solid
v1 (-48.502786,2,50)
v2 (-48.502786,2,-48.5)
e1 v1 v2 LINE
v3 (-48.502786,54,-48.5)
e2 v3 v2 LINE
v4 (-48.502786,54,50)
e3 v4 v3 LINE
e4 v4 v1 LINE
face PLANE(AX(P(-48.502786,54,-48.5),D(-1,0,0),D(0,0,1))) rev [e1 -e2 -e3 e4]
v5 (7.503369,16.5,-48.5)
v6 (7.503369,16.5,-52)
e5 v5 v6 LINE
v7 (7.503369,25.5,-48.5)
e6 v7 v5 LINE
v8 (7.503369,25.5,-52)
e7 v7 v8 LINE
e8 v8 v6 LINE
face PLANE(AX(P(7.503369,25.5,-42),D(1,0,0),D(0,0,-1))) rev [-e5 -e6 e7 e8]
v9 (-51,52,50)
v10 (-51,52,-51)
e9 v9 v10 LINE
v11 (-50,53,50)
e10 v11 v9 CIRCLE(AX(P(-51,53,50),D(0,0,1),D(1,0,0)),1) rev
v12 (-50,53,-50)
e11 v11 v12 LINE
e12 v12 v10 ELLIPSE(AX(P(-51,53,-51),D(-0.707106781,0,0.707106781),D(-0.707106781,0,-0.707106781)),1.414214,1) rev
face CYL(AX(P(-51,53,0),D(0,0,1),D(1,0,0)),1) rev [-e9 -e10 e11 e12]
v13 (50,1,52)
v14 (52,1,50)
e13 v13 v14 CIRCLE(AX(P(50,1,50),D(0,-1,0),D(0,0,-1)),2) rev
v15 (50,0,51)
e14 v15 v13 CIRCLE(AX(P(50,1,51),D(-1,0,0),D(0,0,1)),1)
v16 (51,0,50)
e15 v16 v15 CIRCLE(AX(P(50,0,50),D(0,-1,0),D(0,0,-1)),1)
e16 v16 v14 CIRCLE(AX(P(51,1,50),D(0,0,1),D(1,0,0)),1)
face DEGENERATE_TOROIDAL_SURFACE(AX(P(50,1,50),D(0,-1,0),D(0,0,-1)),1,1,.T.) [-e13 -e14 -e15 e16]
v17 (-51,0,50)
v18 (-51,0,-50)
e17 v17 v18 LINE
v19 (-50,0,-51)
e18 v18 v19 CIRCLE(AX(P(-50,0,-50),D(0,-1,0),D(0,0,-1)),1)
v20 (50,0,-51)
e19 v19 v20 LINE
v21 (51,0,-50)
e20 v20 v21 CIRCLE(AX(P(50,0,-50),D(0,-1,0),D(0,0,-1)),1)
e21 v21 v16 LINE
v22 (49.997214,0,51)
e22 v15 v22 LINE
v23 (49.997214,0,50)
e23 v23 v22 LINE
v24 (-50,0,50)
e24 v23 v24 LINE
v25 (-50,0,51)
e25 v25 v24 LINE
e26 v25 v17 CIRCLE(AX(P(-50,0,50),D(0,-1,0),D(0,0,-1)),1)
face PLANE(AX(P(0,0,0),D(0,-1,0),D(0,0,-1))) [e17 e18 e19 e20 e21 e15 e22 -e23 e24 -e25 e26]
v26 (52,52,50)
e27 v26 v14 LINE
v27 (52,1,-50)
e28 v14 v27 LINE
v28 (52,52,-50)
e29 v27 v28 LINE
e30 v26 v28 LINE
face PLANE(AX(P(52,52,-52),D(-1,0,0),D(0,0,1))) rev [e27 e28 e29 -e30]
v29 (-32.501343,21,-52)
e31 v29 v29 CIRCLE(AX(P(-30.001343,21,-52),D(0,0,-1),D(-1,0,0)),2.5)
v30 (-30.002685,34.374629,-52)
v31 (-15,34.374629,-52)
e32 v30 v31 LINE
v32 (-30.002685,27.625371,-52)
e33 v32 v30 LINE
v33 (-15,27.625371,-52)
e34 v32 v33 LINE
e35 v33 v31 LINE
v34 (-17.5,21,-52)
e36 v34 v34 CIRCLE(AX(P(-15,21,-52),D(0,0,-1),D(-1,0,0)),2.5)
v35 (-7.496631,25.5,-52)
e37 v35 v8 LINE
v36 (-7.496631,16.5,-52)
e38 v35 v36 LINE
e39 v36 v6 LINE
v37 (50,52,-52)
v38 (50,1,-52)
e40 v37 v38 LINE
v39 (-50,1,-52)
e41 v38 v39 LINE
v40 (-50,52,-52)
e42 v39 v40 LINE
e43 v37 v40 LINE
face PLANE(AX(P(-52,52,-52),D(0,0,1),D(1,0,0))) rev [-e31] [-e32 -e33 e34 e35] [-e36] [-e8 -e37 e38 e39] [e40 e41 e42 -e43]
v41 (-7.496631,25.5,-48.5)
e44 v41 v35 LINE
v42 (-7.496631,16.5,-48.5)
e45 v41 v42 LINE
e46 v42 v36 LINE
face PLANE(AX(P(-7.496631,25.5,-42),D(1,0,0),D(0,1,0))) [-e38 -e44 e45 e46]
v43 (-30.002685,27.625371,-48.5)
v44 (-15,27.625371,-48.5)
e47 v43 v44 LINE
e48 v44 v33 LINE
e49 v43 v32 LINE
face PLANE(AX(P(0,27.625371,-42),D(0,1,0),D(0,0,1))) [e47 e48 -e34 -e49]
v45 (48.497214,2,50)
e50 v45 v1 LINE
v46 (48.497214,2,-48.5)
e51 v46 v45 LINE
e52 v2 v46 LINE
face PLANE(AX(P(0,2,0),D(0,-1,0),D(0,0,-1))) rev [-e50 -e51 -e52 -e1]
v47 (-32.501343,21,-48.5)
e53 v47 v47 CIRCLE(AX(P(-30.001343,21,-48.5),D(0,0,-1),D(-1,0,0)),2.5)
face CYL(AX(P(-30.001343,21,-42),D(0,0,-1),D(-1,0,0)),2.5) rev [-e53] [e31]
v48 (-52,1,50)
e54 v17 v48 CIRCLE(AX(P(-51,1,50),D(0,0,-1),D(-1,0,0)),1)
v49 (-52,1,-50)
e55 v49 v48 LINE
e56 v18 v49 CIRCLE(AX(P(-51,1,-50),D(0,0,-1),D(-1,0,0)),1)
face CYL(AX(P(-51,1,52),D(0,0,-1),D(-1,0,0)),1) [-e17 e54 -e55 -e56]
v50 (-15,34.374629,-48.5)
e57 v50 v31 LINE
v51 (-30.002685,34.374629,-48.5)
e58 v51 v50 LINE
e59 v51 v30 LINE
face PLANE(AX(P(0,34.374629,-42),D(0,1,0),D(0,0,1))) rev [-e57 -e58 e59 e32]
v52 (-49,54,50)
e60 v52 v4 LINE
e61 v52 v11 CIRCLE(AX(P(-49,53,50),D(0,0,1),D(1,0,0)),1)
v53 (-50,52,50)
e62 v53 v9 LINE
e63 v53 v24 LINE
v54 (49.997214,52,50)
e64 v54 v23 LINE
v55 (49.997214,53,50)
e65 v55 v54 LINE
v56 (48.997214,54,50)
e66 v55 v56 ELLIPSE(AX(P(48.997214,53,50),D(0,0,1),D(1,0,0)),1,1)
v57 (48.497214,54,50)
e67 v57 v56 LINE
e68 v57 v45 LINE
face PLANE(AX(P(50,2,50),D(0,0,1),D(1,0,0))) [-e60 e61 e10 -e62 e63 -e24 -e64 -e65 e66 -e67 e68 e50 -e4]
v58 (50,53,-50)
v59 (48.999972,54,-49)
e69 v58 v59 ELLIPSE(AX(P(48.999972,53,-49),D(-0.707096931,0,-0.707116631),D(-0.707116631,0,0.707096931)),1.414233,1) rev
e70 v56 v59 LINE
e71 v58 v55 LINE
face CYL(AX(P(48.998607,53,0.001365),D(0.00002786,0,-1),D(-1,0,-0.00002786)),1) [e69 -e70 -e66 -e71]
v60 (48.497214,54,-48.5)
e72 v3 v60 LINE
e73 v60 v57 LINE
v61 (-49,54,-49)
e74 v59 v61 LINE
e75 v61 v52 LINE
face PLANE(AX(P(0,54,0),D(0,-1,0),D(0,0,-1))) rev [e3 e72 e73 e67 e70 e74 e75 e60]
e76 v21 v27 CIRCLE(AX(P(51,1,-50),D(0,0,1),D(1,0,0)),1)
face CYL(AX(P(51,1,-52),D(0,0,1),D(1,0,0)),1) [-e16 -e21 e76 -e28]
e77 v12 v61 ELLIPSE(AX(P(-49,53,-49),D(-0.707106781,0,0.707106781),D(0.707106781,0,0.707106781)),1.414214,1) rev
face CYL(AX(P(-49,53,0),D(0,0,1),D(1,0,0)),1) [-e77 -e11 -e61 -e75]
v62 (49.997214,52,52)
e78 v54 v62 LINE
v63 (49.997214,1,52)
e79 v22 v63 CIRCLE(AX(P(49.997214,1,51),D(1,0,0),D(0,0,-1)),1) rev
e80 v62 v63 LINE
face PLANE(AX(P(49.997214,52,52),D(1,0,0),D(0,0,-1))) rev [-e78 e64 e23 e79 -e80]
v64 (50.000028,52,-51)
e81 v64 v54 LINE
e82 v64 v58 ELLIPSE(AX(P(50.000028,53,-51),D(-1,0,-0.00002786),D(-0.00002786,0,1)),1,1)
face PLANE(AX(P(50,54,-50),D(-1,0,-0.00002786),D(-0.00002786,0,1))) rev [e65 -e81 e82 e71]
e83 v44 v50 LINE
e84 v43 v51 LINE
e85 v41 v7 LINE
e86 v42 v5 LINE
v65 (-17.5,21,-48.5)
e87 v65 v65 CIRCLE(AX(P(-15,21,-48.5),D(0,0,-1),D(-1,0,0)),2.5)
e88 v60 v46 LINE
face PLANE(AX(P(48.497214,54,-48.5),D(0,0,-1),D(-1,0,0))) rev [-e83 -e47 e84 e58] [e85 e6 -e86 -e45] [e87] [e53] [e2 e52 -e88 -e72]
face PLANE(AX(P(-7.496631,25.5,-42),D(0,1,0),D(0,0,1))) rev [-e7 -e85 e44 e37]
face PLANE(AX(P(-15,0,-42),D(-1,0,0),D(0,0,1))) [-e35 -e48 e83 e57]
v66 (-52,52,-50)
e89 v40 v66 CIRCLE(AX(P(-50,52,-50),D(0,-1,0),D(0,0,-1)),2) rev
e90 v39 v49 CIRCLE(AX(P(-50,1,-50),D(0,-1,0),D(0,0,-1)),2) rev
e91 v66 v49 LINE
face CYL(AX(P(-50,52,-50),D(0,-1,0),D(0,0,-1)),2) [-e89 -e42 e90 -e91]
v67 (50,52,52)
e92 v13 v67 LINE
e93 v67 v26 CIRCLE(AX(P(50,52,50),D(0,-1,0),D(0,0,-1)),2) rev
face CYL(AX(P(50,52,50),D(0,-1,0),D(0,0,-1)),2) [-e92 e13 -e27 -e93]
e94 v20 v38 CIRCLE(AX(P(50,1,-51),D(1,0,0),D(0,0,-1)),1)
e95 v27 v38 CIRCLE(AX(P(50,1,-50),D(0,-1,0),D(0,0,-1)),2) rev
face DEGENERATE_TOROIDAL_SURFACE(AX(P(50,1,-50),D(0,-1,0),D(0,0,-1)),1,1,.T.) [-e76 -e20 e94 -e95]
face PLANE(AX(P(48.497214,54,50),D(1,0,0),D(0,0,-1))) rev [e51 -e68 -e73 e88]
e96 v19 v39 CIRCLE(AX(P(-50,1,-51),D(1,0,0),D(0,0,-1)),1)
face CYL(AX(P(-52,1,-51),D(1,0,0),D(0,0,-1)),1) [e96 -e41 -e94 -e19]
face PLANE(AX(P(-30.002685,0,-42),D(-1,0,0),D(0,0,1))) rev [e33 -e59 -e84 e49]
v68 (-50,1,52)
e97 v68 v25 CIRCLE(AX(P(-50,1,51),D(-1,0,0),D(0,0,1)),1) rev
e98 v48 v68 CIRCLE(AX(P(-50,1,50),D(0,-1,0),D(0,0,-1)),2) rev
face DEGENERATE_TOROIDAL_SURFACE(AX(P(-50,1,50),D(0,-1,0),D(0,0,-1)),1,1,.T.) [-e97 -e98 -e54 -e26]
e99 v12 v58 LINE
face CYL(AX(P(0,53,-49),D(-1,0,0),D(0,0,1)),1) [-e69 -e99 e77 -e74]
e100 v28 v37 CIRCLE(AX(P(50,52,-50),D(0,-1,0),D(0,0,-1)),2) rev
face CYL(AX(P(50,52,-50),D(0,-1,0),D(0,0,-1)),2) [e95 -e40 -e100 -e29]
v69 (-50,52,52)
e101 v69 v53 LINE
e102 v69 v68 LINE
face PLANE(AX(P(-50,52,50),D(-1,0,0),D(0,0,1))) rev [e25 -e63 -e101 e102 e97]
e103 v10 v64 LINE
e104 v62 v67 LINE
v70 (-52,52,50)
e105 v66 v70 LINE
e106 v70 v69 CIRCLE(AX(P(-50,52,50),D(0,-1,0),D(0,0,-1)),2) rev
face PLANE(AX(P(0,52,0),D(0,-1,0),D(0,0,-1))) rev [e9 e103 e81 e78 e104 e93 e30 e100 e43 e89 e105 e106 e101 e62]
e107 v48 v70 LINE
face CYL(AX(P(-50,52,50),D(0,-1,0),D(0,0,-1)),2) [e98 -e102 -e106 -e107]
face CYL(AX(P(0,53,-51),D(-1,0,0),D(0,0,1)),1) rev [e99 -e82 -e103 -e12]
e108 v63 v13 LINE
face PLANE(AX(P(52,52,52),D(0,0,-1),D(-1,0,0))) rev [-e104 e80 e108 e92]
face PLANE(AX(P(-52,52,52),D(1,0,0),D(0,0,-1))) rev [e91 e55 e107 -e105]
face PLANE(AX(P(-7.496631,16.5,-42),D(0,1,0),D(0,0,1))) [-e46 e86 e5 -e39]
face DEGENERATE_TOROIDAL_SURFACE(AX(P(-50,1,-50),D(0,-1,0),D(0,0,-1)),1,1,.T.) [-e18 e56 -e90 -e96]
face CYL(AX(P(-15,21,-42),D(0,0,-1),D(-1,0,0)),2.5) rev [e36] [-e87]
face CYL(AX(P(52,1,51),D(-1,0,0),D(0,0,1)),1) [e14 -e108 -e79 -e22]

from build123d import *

# Parameters (mm, degrees)
SCHIZZO1_W                   = 100
SCHIZZO1_H                   = 100
ESTRUSIONE_ESTRUSIONE1_DEPTH = 2
ESTRUSIONE_ESTRUSIONE2_DEPTH = 52
ESTRUSIONE_ESTRUSIONE3_DEPTH = 54
RACCORDO1_R                  = 1
RACCORDO2_R                  = 1
RACCORDO3_R                  = 2
RACCORDO4_R                  = 2
RACCORDO5_R                  = 1
SCHIZZO4_R                   = 2.5
SCHIZZO4_W                   = 15.002685422
SCHIZZO4_H                   = 6.74925895
SCHIZZO4_W_2                 = 15
SCHIZZO4_H_2                 = 9
TAGLIO_ESTRUSIONE1_DEPTH     = 10


with BuildPart() as part:
    # Schizzo1 → Estrusione-Estrusione1 (new body)
    with BuildSketch(Plane(origin=(0, 0, 0), x_dir=(1, 0, 0), z_dir=(0, 1, 0))):
        Rectangle(SCHIZZO1_W, SCHIZZO1_H)
    extrude(amount=ESTRUSIONE_ESTRUSIONE1_DEPTH)

    # Schizzo2 → Estrusione-Estrusione2 (add)
    with BuildSketch(Plane(origin=(0, 0, 0), x_dir=(1, 0, 0), z_dir=(0, 1, 0))):
        Polygon((-50, -50), (-50, -52), (-52, -52), (-52, 52), (52, 52), (52, -52), (49.997213979, -52), (49.997213979, -50), (50, 50), (-50, 50), align=None)
    extrude(amount=ESTRUSIONE_ESTRUSIONE2_DEPTH)

    # Schizzo3 → Estrusione-Estrusione3 (add)
    with BuildSketch(Plane(origin=(0, 0, 0), x_dir=(1, 0, 0), z_dir=(0, 1, 0))):
        Polygon((-50, -50), (-50, 50), (50, 50), (49.997213979, -50), (48.497213979, -50), (48.497213979, 48.5), (-48.502786021, 48.5), (-48.502786021, -50), align=None)
    extrude(amount=ESTRUSIONE_ESTRUSIONE3_DEPTH)

    # Raccordo1
    raccordo1_edges = [part.edges().sort_by_distance(p)[0] for p in [
        (49.998606989, 54, 0),
        (0, 54, -50),
        (-50, 54, 0),
    ]]
    fillet(raccordo1_edges, radius=RACCORDO1_R)

    # Raccordo2
    raccordo2_edges = [part.edges().sort_by_distance(p)[0] for p in [
        (-50, 52, 0),
        (0, 52, -50),
    ]]
    fillet(raccordo2_edges, radius=RACCORDO2_R - 0.0001)  # a hair under: the kernel refuses the full size

    # Raccordo3
    raccordo3_edges = [part.edges().sort_by_distance(p)[0] for p in [
        (52, 26, 52),
        (52, 26, -52),
        (-52, 26, 52),
    ]]
    fillet(raccordo3_edges, radius=RACCORDO3_R - 0.0001)  # a hair under: the kernel refuses the full size

    # Raccordo4
    raccordo4_edges = [part.edges().sort_by_distance(p)[0] for p in [
        (-52, 26, -52),
    ]]
    fillet(raccordo4_edges, radius=RACCORDO4_R)

    # Raccordo5
    raccordo5_edges = [part.edges().sort_by_distance(p)[0] for p in [
        (5e-05, 0, -52),
        (52, 0, 0),
        (-51.414242852, 0, 51.414242852),
        (51.414242852, 0, 51.414242852),
        (51.414242852, 0, -51.414242852),
        (-52, 0, 5e-05),
        (-51.414213562, 0, -51.414213562),
        (49.998656989, 0, 52),
    ]]
    fillet(raccordo5_edges, radius=RACCORDO5_R)

    # Schizzo4 → Taglio-Estrusione1 (cut)
    with BuildSketch(Plane(origin=(0, 0, -52), x_dir=(-1, 0, 0), z_dir=(0, 0, -1))):
        with Locations((15, 21)):
            Circle(SCHIZZO4_R)
        with Locations((30.001342711, 21)):
            Circle(SCHIZZO4_R)
        with Locations((22.501342711, 31)):
            Rectangle(SCHIZZO4_W, SCHIZZO4_H)
        with Locations((-0.00336937, 21)):
            Rectangle(SCHIZZO4_W_2, SCHIZZO4_H_2)
    extrude(amount=-TAGLIO_ESTRUSIONE1_DEPTH, mode=Mode.SUBTRACT)


solid = part.part
